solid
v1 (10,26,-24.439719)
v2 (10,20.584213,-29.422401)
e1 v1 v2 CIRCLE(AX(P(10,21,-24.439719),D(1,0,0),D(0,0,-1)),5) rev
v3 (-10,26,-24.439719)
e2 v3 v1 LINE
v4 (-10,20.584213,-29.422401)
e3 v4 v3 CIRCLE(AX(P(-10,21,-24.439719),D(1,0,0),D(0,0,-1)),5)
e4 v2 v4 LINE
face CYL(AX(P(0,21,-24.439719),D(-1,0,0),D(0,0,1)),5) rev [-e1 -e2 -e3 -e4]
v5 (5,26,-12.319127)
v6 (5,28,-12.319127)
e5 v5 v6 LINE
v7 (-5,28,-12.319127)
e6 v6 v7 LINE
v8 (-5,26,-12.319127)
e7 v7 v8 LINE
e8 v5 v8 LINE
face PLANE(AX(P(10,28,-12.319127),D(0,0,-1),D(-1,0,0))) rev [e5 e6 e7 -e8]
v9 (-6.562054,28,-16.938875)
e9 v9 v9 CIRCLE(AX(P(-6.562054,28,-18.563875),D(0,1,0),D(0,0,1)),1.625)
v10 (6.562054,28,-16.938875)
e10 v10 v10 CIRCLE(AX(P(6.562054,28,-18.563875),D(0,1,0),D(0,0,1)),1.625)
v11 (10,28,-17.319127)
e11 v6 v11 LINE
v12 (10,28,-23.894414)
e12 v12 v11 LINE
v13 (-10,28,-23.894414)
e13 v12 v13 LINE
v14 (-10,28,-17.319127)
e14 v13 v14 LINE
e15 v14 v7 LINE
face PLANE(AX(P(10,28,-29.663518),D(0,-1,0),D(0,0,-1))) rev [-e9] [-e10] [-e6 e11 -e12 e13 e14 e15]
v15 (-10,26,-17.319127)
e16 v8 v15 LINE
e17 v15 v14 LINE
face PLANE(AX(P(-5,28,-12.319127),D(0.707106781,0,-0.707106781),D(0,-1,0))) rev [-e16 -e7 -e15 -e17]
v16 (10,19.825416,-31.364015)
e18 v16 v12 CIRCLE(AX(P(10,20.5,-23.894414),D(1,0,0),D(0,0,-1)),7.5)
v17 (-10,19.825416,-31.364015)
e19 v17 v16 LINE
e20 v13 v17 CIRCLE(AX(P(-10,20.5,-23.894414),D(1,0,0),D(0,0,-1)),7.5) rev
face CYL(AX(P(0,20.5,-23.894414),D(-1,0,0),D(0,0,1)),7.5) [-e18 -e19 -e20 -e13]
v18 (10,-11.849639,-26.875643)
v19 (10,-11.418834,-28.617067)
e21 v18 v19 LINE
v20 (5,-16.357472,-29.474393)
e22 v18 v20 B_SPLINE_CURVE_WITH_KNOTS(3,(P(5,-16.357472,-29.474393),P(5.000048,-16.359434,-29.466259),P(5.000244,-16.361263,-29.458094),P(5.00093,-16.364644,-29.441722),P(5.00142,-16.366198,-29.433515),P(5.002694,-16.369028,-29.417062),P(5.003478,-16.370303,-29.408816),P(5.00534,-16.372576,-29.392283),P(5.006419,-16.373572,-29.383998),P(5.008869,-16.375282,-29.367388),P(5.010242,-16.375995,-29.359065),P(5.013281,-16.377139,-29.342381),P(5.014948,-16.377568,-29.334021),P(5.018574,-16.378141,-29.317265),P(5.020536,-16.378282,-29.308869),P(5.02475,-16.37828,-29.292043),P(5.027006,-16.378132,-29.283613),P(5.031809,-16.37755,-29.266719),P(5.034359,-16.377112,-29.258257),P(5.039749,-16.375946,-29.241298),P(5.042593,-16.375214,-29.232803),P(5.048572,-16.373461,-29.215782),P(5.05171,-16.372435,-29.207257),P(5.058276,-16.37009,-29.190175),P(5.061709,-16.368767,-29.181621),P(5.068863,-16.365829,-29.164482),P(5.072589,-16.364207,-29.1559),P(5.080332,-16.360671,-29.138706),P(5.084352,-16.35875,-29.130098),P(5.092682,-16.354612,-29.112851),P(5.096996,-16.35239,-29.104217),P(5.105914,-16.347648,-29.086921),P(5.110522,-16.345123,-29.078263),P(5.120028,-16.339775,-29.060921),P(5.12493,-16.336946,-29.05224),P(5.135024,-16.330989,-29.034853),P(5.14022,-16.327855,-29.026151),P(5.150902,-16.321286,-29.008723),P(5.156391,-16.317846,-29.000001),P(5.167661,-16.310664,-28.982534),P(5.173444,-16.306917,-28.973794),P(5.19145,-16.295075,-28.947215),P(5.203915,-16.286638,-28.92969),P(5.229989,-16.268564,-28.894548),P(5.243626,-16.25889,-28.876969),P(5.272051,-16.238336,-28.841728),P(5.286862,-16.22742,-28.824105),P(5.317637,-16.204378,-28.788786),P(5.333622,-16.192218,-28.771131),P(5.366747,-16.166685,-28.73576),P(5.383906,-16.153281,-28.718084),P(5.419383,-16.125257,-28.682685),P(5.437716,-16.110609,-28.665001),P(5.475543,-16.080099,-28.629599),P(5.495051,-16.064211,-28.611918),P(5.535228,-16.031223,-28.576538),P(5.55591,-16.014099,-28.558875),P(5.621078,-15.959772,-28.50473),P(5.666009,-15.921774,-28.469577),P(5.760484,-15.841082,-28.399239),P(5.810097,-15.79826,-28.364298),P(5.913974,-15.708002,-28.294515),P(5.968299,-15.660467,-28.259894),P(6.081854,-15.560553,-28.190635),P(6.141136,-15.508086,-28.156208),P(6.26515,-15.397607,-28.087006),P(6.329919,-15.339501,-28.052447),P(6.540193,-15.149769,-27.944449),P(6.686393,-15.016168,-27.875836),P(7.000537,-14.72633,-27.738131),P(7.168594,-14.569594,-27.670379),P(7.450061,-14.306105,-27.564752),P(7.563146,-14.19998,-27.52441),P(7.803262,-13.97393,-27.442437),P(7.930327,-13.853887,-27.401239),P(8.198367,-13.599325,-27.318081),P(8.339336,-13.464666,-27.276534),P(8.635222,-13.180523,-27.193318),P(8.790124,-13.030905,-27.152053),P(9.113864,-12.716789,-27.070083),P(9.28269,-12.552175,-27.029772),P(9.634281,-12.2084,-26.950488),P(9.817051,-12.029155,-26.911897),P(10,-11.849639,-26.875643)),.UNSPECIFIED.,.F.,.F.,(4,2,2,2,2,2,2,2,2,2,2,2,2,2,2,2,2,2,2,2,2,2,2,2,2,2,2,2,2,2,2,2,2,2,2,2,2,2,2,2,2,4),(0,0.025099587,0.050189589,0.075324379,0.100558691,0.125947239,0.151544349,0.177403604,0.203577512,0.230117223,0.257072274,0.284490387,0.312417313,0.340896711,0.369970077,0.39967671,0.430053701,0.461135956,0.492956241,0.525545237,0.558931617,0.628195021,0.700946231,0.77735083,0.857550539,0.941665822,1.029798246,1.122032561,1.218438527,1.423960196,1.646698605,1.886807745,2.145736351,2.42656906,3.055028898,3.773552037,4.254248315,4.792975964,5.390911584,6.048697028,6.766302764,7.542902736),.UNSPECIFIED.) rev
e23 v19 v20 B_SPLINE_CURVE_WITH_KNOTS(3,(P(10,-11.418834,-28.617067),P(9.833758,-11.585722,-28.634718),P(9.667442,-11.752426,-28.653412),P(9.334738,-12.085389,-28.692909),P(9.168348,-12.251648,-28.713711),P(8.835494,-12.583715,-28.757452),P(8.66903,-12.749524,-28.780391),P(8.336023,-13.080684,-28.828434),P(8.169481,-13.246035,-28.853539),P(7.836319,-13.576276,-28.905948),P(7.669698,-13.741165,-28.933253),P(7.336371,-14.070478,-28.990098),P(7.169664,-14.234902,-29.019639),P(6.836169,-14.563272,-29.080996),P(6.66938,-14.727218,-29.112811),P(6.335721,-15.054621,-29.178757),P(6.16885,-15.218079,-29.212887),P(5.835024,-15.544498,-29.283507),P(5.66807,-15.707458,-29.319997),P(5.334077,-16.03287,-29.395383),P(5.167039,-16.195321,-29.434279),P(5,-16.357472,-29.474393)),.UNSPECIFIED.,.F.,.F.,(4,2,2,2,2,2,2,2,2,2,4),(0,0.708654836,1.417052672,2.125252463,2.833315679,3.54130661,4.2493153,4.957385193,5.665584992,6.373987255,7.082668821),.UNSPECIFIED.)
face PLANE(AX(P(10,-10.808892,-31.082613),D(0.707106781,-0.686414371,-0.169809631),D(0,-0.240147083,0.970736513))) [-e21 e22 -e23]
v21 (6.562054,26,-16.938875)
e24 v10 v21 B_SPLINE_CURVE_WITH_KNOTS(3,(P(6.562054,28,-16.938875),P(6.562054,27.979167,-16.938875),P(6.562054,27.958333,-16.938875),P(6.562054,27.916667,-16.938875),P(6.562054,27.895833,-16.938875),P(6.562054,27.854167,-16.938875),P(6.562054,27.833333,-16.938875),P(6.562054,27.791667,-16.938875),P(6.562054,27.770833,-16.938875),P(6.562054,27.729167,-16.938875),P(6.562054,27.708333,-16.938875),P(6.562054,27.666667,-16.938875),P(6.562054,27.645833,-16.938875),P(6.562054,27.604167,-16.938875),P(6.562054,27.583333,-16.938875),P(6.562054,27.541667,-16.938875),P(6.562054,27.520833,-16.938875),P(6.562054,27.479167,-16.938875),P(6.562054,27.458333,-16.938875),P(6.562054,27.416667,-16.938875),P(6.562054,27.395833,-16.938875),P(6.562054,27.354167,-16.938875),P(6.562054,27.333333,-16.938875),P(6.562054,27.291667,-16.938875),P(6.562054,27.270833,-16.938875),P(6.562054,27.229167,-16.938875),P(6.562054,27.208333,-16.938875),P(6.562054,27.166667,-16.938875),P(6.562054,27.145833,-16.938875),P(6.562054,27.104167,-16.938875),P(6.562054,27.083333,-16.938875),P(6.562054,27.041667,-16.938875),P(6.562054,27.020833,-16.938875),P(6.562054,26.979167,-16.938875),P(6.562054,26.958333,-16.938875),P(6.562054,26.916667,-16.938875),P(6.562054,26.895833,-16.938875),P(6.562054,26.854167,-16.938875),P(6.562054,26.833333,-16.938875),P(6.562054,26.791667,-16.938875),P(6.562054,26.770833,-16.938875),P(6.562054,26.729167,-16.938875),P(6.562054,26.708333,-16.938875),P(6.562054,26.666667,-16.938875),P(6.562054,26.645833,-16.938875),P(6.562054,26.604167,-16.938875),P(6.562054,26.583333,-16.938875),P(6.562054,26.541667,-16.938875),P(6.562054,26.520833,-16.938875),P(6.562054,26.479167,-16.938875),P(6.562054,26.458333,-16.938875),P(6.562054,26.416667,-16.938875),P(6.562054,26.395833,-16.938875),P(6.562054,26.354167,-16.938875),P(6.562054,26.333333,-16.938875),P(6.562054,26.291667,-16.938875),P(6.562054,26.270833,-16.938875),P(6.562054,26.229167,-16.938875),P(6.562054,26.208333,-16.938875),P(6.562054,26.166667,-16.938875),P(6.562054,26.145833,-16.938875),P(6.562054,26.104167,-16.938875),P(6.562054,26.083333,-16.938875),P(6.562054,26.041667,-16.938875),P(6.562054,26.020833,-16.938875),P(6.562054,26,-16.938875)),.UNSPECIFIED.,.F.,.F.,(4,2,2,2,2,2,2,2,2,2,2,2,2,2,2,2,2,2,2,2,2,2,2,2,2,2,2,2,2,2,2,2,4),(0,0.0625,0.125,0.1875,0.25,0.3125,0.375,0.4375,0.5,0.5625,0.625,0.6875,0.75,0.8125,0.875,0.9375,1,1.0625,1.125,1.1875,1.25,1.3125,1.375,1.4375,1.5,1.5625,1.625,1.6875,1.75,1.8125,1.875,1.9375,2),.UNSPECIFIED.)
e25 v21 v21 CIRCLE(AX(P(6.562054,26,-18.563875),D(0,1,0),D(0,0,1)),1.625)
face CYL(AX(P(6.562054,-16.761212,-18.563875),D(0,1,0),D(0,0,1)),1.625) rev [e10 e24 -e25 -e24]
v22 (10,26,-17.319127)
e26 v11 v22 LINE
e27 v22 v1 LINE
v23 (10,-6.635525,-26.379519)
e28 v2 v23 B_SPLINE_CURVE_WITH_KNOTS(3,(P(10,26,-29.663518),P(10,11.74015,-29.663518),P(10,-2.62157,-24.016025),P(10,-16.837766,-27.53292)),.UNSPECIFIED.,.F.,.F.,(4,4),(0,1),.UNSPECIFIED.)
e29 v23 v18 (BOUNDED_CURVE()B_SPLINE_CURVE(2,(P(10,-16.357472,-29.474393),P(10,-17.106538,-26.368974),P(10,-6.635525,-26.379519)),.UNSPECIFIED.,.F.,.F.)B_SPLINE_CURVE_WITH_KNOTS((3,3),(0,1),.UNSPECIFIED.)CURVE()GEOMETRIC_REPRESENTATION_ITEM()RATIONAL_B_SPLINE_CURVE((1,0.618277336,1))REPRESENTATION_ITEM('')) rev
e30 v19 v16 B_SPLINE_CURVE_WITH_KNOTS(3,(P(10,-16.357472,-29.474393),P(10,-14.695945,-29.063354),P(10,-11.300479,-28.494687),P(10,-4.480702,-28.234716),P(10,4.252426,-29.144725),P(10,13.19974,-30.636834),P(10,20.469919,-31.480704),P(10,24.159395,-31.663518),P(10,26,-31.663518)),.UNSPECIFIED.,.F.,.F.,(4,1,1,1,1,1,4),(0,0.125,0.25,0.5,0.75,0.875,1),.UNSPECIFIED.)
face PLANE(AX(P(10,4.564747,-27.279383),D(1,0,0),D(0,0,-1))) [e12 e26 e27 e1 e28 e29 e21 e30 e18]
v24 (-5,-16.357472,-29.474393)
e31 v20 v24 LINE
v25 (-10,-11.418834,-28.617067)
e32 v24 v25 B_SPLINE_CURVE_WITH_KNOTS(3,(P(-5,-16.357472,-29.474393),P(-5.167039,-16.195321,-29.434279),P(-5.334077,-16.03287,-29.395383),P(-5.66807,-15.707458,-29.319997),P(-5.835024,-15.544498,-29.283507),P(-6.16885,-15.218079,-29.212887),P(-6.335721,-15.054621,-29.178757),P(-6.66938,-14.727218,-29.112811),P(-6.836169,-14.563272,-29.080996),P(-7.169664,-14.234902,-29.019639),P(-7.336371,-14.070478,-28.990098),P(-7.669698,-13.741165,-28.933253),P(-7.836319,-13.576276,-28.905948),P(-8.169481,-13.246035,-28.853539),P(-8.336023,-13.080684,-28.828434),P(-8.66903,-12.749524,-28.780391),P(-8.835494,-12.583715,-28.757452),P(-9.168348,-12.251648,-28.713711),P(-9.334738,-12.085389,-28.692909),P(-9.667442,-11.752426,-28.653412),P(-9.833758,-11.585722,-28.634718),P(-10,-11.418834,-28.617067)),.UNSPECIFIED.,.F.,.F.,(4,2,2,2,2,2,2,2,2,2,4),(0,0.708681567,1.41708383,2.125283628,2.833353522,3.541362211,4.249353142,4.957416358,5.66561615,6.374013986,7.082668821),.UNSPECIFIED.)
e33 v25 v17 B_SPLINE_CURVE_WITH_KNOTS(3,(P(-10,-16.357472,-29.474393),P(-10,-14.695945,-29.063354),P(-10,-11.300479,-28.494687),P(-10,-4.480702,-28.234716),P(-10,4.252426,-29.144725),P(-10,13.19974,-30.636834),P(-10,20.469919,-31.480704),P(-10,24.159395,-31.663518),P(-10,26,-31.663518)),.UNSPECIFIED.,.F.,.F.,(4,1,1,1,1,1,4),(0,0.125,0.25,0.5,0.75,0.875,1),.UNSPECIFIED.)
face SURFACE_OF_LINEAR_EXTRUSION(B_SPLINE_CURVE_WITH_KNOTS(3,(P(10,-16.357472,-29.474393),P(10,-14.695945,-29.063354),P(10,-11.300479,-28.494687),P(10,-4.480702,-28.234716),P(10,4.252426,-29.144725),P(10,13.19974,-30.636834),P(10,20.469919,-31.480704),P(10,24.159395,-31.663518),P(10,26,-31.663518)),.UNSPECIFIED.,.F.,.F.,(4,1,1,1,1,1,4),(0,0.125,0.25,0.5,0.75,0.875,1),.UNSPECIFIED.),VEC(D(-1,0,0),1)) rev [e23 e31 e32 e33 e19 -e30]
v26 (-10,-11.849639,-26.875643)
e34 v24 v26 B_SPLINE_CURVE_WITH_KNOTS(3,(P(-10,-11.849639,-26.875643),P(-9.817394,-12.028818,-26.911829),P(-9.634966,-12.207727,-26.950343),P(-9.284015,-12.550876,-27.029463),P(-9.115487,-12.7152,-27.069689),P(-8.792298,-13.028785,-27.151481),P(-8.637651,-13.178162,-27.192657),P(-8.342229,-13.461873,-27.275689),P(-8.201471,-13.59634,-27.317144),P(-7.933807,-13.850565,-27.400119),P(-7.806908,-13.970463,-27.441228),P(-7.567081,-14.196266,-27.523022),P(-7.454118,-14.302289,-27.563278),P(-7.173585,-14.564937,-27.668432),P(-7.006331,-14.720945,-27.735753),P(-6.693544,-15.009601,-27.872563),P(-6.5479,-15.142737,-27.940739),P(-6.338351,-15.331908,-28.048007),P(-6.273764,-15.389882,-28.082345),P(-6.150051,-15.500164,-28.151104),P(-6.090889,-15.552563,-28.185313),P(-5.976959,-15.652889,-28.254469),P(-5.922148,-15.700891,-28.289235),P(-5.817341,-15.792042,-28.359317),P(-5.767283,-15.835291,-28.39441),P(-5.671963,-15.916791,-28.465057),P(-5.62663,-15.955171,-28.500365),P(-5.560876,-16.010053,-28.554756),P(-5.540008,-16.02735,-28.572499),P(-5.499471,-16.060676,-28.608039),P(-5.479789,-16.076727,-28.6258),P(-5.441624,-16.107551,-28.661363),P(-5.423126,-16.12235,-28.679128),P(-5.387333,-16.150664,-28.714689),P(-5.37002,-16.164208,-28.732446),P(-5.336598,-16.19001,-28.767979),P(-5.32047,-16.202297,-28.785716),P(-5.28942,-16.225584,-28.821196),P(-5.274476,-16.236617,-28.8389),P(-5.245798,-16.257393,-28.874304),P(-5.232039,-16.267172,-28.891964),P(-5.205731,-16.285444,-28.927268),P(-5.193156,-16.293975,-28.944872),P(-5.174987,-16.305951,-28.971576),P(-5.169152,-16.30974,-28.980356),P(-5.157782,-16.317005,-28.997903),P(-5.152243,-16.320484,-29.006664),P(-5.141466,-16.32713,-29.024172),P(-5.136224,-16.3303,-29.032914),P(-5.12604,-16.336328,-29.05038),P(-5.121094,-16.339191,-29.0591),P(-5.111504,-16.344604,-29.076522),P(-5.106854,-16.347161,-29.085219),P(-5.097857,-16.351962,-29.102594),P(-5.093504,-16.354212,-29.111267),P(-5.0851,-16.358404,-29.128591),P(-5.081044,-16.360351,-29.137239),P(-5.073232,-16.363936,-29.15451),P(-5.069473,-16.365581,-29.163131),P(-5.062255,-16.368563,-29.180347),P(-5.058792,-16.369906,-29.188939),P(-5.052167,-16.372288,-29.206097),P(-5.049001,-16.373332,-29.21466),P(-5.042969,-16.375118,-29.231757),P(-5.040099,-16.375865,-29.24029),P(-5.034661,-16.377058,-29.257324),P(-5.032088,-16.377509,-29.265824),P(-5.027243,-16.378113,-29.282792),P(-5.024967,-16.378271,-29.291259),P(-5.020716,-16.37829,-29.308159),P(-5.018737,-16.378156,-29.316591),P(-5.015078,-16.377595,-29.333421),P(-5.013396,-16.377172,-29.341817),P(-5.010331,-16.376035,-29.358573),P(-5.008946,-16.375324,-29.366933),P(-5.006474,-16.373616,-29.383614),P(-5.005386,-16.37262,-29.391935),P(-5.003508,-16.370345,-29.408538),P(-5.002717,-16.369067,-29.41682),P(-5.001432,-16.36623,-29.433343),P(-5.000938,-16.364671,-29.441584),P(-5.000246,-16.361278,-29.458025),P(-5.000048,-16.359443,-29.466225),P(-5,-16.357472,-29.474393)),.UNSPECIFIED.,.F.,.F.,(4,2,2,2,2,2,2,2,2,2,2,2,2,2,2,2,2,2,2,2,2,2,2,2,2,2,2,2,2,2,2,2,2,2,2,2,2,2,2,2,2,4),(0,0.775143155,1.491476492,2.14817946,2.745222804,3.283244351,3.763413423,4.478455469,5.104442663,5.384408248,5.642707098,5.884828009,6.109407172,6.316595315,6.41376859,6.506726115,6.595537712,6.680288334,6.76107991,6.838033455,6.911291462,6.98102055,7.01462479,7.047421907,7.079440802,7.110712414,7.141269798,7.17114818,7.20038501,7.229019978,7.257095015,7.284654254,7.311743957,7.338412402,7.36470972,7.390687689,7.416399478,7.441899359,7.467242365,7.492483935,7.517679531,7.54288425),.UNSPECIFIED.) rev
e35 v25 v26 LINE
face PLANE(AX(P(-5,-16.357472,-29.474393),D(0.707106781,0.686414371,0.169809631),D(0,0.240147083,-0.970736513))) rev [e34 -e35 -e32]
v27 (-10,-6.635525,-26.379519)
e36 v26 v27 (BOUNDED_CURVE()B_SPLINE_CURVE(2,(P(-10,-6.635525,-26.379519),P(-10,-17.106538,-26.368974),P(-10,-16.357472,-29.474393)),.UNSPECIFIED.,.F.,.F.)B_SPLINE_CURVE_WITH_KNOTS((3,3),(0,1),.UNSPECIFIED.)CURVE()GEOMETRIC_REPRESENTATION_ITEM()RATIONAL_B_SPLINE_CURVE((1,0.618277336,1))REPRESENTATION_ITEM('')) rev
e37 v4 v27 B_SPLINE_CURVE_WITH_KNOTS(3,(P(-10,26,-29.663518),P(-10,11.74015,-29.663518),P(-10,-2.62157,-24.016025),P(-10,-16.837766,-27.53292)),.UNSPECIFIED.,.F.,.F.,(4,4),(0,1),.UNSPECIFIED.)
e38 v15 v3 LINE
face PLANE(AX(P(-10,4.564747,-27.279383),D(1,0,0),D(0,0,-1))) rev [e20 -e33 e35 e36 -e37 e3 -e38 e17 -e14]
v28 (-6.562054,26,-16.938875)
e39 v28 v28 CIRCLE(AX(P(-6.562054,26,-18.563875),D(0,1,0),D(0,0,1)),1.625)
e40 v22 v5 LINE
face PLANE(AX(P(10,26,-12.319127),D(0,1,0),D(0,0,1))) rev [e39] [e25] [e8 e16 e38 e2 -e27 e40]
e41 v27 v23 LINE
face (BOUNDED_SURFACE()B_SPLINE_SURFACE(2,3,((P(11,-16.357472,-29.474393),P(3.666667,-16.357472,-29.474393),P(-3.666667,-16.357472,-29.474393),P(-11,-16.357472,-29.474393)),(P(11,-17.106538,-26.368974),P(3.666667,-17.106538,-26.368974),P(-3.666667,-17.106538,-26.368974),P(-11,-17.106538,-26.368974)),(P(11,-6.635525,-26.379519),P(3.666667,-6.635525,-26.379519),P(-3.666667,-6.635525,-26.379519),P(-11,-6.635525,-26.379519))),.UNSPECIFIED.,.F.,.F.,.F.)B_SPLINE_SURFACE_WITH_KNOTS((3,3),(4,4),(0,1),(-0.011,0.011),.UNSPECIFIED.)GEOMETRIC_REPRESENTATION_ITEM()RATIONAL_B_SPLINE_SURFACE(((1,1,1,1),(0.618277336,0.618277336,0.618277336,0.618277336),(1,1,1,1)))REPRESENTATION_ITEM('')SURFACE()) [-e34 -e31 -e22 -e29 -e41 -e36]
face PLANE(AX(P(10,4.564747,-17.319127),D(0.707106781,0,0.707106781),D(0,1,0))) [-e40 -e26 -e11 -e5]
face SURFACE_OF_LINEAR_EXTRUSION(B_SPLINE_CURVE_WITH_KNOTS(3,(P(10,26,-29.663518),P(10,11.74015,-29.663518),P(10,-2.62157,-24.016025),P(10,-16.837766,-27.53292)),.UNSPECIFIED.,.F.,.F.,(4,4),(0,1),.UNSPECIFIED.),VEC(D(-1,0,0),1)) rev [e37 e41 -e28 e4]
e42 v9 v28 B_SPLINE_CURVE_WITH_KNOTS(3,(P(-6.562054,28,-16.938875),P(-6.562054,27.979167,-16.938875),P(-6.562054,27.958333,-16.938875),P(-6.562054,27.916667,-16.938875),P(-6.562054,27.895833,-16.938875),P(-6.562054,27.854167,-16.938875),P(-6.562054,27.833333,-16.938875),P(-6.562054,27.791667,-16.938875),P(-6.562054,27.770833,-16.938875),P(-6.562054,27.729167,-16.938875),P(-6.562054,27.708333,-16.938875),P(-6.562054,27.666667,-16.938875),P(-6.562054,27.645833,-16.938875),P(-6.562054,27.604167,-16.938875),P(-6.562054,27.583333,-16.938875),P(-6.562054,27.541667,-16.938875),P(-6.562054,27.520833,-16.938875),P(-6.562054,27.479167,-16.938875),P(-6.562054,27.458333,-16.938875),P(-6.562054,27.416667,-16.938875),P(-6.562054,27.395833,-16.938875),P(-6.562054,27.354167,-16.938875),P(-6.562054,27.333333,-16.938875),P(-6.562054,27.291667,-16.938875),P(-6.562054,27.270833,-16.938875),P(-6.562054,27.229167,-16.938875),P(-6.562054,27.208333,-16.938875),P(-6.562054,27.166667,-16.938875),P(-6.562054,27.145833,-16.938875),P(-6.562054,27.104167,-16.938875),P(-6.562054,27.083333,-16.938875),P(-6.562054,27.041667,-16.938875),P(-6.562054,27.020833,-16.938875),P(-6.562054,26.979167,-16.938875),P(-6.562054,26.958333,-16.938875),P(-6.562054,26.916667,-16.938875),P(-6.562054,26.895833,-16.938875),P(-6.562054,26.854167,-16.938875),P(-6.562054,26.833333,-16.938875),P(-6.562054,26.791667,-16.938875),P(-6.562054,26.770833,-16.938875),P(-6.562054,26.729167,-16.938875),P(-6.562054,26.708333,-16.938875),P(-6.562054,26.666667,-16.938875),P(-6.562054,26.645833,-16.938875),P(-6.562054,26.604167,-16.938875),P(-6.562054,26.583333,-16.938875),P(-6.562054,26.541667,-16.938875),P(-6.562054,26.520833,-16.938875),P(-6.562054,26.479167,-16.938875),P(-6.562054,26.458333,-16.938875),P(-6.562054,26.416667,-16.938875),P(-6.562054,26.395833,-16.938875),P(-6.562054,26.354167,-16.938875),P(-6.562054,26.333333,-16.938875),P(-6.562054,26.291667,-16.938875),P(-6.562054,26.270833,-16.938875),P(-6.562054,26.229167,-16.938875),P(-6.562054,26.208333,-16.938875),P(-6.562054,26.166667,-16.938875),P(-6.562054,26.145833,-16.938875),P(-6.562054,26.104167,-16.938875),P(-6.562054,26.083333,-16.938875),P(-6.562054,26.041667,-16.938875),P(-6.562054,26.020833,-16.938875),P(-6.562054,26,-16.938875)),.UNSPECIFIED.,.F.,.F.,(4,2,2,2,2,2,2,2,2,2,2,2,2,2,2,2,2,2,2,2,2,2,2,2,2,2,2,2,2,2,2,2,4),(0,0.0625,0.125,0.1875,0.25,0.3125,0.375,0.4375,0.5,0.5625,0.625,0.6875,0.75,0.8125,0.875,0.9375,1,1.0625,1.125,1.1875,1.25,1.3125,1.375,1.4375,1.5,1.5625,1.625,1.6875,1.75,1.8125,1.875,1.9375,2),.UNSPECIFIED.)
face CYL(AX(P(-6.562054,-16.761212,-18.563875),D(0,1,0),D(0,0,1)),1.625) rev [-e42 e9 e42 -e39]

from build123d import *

# Parameters (mm, degrees)
BOSS_EXTRUDE1_DEPTH = 10
CHAMFER1_SIZE       = 5
FILLET1_R           = 5
FILLET2_R           = 7.5
FILLET3_START       = -10
FILLET3_DEPTH       = 20
SKETCH3_R           = 1.625
CUT_EXTRUDE1_DEPTH  = 56.272426005


with BuildPart() as part:
    # Sketch1 → Boss-Extrude1 (new, symmetric)
    with BuildSketch(Plane(origin=(0, 0, 0), x_dir=(0, 0, -1), z_dir=(1, 0, 0))):
        with BuildLine():
            Line((12.319127455, 26), (29.663517642, 26))
            add(Edge.make_bspline(
                [(29.663517642, 26), (29.663517642, 11.740150088), (24.016025287, -2.621570193), (27.532919864, -16.837766109)],
                knots=[0, 0, 0, 0, 1, 1, 1, 1], degree=3))
            Line((27.532919864, -16.837766109), (29.474392891, -16.357471943))
            add(Edge.make_bspline(
                [(31.663517642, 26), (31.663517642, 24.15939465), (31.480704272, 20.46991898), (30.636833768, 13.199740185), (29.144724775, 4.252426008), (28.234715818, -4.480702376), (28.494687407, -11.300478686), (29.06335364, -14.695945165), (29.474392891, -16.357471943)],
                knots=[0, 0, 0, 0, 0.125, 0.25, 0.5, 0.75, 0.875, 1, 1, 1, 1], degree=3))
            Line((31.663517642, 26), (31.663517642, 28))
            Line((31.663517642, 28), (29.663517642, 28))
            Line((29.663517642, 28), (12.319127455, 28))
            Line((12.319127455, 28), (12.319127455, 26))
        make_face()
    extrude(amount=BOSS_EXTRUDE1_DEPTH, both=True)

    # Chamfer1
    chamfer1_edges = [part.edges().sort_by_distance(p)[0] for p in [
        (10, -16.597619026, -28.503656378),
        (-10, -16.597619026, -28.503656378),
        (-10, 27, -12.319127455),
        (10, 27, -12.319127455),
    ]]
    chamfer(chamfer1_edges, length=CHAMFER1_SIZE)

    # Fillet1
    fillet1_edges = [part.edges().sort_by_distance(p)[0] for p in [
        (-5, 26, -29.663517642),
    ]]
    fillet(fillet1_edges, radius=FILLET1_R)

    # Fillet2
    fillet2_edges = [part.edges().sort_by_distance(p)[0] for p in [
        (0, 28, -31.663517642),
    ]]
    fillet(fillet2_edges, radius=FILLET2_R)

    # Fillet3: read off the stored shape, not the designer's step
    # Fillet3 outline → Fillet3 (cut)
    with BuildSketch(Plane.YZ.offset(FILLET3_START)):
        with BuildLine():
            Line((-16.837766109, -27.532919864), (-16.357471943, -29.474392891))
            add(Edge.make_bspline(
                [(-16.357471943, -29.474392891), (-17.106538204, -26.368974262), (-6.635525171, -26.379518895)],
                knots=[0, 0, 0, 1, 1, 1], degree=2, weights=[1, 0.618277336, 1]))
            add(Edge.make_bspline(
                [(-6.635525171, -26.379518895), (-10.042321147, -26.376088146), (-13.444189865, -26.693395004), (-16.837766109, -27.532919864)],
                knots=[0.761288022, 0.761288022, 0.761288022, 0.761288022, 1, 1, 1, 1], degree=3))
        make_face()
    extrude(amount=FILLET3_DEPTH, mode=Mode.SUBTRACT)

    # Sketch3 → Cut-Extrude1 (cut, through all)
    with BuildSketch(Plane(origin=(0, 28, 0), x_dir=(1, 0, 0), z_dir=(0, 1, 0))):
        with Locations(Location((-6.562054303, 18.563874533, 0), (0, 0, 270))):
            Circle(SKETCH3_R)
        with Locations(Location((6.562054303, 18.563874533, 0), (0, 0, 270))):
            Circle(SKETCH3_R)
    extrude(amount=-CUT_EXTRUDE1_DEPTH, mode=Mode.SUBTRACT)


solid = part.part
